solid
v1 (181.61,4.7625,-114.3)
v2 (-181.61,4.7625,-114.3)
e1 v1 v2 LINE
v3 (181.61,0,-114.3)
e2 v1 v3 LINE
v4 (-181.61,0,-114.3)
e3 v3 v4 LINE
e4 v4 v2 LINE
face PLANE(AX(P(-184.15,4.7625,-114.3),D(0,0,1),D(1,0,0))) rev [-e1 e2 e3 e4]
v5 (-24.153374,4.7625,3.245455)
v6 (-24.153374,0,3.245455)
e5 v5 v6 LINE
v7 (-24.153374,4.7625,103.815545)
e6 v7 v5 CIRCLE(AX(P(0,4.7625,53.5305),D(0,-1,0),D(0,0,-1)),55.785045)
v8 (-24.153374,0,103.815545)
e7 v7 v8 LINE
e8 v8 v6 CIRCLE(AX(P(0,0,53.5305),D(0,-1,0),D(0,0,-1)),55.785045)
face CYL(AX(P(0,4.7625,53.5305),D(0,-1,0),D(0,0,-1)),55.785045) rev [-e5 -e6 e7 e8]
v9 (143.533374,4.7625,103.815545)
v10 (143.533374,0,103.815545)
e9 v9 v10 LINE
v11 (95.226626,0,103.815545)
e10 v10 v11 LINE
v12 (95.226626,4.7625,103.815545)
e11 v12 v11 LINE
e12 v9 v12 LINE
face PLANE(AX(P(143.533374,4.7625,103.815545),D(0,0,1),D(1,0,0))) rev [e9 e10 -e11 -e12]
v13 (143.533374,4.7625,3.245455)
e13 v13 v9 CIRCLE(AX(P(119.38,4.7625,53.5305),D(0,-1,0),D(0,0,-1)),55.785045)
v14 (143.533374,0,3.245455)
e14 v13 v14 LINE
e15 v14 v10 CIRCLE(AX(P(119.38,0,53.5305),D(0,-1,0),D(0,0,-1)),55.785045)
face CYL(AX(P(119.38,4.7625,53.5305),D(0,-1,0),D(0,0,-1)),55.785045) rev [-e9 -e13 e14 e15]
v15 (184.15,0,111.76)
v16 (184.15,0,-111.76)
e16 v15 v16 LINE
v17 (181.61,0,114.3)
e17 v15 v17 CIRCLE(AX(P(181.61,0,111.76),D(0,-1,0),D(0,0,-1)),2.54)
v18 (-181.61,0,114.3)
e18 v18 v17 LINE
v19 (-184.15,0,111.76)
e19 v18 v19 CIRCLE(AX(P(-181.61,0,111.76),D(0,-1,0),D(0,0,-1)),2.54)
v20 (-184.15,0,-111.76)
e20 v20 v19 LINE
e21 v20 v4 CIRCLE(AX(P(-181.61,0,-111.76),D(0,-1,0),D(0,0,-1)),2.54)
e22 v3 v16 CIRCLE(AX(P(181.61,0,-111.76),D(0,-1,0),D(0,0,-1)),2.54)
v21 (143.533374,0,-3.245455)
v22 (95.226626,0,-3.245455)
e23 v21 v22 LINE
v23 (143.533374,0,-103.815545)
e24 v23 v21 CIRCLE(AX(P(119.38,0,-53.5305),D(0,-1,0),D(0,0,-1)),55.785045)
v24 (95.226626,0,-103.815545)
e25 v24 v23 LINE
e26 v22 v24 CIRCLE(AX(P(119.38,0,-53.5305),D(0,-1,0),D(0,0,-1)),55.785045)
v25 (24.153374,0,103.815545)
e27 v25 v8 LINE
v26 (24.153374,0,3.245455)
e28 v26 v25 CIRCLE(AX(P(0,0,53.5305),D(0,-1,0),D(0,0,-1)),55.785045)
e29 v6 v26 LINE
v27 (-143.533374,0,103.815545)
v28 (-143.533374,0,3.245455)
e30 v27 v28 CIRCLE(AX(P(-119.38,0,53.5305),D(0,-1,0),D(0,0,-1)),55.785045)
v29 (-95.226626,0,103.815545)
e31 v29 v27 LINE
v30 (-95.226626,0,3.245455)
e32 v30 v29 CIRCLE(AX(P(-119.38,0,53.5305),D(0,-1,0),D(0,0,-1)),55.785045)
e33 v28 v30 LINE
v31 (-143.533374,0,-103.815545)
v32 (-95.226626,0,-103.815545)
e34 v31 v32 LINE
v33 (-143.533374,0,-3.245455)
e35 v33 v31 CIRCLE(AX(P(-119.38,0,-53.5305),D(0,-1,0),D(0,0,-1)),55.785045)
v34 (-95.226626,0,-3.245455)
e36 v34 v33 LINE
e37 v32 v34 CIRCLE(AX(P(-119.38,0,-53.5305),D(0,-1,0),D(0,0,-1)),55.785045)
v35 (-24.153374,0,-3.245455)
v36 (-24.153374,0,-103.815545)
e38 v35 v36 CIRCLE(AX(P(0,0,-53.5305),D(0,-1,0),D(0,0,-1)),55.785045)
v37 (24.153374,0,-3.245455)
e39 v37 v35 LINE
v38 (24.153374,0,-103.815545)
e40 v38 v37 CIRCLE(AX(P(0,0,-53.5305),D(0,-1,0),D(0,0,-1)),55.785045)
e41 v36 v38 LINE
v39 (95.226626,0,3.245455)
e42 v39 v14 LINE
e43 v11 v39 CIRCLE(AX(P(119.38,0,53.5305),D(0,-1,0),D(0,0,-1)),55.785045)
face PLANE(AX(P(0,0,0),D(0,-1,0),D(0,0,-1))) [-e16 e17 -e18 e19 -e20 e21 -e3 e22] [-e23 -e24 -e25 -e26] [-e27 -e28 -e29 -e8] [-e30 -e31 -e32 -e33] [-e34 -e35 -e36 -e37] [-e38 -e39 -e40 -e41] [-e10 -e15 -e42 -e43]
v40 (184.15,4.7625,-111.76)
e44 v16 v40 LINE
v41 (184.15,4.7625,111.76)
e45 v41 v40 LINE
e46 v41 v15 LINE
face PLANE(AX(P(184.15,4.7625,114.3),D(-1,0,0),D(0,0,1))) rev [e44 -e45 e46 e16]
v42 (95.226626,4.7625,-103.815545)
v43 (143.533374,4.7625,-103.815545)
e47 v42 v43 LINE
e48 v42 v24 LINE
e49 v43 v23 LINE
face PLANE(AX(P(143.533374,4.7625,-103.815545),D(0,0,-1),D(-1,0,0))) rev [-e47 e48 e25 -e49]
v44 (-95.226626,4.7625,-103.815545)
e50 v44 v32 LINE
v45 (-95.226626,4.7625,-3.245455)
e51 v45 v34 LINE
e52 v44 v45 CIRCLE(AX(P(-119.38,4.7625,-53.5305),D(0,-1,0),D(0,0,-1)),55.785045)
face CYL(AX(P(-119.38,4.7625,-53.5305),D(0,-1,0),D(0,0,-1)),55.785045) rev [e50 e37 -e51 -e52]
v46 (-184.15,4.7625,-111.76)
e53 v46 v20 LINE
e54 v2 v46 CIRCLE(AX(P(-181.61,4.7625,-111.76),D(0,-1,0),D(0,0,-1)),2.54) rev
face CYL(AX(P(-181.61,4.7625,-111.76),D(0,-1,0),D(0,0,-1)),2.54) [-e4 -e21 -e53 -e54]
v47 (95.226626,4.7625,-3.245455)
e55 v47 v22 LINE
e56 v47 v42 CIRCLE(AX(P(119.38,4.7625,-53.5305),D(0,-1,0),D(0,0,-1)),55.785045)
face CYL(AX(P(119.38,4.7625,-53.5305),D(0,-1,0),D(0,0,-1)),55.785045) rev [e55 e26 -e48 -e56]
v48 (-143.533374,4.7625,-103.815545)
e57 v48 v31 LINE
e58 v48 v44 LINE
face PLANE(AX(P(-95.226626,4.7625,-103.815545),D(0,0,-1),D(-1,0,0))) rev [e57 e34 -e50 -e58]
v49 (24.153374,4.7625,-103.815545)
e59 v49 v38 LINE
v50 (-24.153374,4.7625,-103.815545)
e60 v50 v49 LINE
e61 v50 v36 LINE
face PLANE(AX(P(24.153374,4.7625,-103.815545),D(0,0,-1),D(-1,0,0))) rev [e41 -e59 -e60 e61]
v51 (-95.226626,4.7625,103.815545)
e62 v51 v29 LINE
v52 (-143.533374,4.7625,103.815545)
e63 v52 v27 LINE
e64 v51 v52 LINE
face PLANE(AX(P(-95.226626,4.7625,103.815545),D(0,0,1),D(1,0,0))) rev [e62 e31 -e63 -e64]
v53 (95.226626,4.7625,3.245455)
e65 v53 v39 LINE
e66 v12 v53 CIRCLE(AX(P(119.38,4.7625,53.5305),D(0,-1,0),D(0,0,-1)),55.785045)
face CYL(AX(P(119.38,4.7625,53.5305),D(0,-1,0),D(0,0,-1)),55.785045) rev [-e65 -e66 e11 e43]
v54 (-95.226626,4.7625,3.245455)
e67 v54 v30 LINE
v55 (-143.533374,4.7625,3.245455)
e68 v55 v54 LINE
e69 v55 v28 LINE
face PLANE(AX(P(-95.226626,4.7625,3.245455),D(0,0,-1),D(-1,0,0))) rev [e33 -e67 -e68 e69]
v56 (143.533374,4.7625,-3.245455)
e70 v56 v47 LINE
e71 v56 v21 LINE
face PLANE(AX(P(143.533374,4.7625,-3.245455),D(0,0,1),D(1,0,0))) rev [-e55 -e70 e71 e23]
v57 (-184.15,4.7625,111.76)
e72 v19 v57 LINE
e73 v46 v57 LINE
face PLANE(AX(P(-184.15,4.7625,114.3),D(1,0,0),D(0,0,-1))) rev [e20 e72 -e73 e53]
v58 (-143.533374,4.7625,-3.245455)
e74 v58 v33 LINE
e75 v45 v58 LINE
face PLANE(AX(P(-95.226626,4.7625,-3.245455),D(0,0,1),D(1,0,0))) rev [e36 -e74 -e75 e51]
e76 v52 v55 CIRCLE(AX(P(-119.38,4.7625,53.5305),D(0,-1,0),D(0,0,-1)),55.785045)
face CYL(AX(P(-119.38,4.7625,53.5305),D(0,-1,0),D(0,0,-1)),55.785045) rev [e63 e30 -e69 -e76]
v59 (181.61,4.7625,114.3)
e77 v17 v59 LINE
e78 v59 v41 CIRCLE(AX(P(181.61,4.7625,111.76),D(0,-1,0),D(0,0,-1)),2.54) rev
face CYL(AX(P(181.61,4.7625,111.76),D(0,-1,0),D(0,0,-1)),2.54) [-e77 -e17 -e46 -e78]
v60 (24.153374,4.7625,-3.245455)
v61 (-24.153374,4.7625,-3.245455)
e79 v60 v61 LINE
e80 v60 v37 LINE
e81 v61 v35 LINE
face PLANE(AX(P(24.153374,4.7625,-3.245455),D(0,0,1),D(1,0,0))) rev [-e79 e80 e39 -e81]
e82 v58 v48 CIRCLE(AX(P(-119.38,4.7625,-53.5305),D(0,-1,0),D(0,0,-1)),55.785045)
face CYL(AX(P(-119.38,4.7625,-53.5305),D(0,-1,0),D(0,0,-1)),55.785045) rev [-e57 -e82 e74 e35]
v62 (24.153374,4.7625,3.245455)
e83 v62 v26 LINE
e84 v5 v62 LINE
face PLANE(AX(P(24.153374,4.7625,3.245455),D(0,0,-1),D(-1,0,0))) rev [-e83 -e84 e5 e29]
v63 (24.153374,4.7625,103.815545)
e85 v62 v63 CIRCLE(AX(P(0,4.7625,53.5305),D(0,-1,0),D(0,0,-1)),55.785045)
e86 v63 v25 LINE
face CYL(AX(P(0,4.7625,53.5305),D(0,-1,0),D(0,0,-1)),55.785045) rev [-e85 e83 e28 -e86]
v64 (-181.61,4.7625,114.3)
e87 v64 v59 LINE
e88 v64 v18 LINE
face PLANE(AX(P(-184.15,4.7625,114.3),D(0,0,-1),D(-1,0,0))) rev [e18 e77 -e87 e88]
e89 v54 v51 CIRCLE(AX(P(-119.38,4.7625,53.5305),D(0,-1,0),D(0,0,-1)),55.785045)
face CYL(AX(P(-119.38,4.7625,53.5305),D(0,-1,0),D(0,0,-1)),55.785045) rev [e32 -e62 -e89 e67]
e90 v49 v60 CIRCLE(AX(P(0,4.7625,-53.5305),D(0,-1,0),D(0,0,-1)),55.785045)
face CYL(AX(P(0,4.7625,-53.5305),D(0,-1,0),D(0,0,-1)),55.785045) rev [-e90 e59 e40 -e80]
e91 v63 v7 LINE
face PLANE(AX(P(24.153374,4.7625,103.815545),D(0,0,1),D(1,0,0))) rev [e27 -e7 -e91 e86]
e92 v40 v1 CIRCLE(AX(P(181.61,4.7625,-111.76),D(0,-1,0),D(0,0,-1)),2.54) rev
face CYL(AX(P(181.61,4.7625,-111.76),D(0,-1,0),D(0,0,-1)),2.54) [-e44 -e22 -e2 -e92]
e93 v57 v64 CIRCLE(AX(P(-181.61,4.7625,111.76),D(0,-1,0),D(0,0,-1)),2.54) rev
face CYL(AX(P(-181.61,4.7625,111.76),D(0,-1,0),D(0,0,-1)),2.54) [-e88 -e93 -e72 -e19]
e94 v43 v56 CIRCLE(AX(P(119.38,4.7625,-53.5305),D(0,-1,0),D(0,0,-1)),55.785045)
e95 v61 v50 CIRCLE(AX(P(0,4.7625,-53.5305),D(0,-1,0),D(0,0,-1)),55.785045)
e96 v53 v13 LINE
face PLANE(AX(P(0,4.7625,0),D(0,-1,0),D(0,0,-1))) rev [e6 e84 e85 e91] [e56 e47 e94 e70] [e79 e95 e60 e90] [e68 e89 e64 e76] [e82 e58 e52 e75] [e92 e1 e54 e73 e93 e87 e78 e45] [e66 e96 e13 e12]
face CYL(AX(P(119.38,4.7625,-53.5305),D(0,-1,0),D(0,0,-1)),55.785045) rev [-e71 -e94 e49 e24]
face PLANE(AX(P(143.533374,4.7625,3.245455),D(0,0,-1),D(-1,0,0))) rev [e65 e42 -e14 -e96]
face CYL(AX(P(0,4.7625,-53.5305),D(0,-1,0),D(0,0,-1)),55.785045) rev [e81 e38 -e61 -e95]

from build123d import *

# Parameters (mm, degrees)
SKETCH1_W             = 368.3
SKETCH1_H             = 228.6
BOSS_EXTRUDE1_DEPTH   = 4.7625
CUT_EXTRUDE1_DEPTH    = 217.791129676
SKETCH_PATTERN1_DEPTH = 4.7625
FILLET1_R             = 2.54


# Read off the part's stored shape, not the designer's step: Sketch-Pattern1
with BuildPart() as part:
    # Sketch1 → Boss-Extrude1 (new body)
    with BuildSketch(Plane(origin=(0, 0, 0), x_dir=(1, 0, 0), z_dir=(0, 1, 0))):
        Rectangle(SKETCH1_W, SKETCH1_H)
    extrude(amount=BOSS_EXTRUDE1_DEPTH)

    # Sketch3 → Cut-Extrude1 (cut, through all)
    with BuildSketch(Plane.XZ):
        with BuildLine():
            Line((143.533374481, -3.245454654), (95.226625519, -3.245454654))
            ThreePointArc((95.226625519, -3.245454654), (63.594954654, -53.5305), (95.226625519, -103.815545346))
            Line((95.226625519, -103.815545346), (143.533374481, -103.815545346))
            ThreePointArc((143.533374481, -103.815545346), (175.165045346, -53.5305), (143.533374481, -3.245454654))
        make_face()
    extrude(amount=-CUT_EXTRUDE1_DEPTH, mode=Mode.SUBTRACT)

    # Sketch-Pattern1 outline → Sketch-Pattern1 (cut)
    with BuildSketch(Plane(origin=(0, 0, 0), x_dir=(1, 0, 0), z_dir=(0, 1, 0))):
        with BuildLine():
            ThreePointArc((-24.153374481, 103.815545346), (-55.785045346, 53.5305), (-24.153374481, 3.245454654))
            Line((-24.153374481, 3.245454654), (24.153374481, 3.245454654))
            ThreePointArc((24.153374481, 3.245454654), (55.785045346, 53.5305), (24.153374481, 103.815545346))
            Line((24.153374481, 103.815545346), (-24.153374481, 103.815545346))
        make_face()
        with BuildLine():
            ThreePointArc((-143.533374481, 103.815545346), (-175.165045346, 53.5305), (-143.533374481, 3.245454654))
            Line((-143.533374481, 3.245454654), (-95.226625519, 3.245454654))
            ThreePointArc((-95.226625519, 3.245454654), (-63.594954654, 53.5305), (-95.226625519, 103.815545346))
            Line((-95.226625519, 103.815545346), (-143.533374481, 103.815545346))
        make_face()
        with BuildLine():
            ThreePointArc((95.226625519, -3.245454654), (63.594954654, -53.5305), (95.226625519, -103.815545346))
            Line((95.226625519, -103.815545346), (143.533374481, -103.815545346))
            ThreePointArc((143.533374481, -103.815545346), (175.165045346, -53.5305), (143.533374481, -3.245454654))
            Line((143.533374481, -3.245454654), (95.226625519, -3.245454654))
        make_face()
        with BuildLine():
            ThreePointArc((-24.153374481, -3.245454654), (-55.785045346, -53.5305), (-24.153374481, -103.815545346))
            Line((-24.153374481, -103.815545346), (24.153374481, -103.815545346))
            ThreePointArc((24.153374481, -103.815545346), (55.785045346, -53.5305), (24.153374481, -3.245454654))
            Line((24.153374481, -3.245454654), (-24.153374481, -3.245454654))
        make_face()
        with BuildLine():
            ThreePointArc((-143.533374481, -3.245454654), (-175.165045346, -53.5305), (-143.533374481, -103.815545346))
            Line((-143.533374481, -103.815545346), (-95.226625519, -103.815545346))
            ThreePointArc((-95.226625519, -103.815545346), (-63.594954654, -53.5305), (-95.226625519, -3.245454654))
            Line((-95.226625519, -3.245454654), (-143.533374481, -3.245454654))
        make_face()
    extrude(amount=SKETCH_PATTERN1_DEPTH, mode=Mode.SUBTRACT)

    # Fillet1
    fillet1_edges = [part.edges().sort_by_distance(p)[0] for p in [
        (184.15, 2.38125, 114.3),
        (-184.15, 2.38125, 114.3),
        (-184.15, 2.38125, -114.3),
        (184.15, 2.38125, -114.3),
    ]]
    fillet(fillet1_edges, radius=FILLET1_R)


solid = part.part
